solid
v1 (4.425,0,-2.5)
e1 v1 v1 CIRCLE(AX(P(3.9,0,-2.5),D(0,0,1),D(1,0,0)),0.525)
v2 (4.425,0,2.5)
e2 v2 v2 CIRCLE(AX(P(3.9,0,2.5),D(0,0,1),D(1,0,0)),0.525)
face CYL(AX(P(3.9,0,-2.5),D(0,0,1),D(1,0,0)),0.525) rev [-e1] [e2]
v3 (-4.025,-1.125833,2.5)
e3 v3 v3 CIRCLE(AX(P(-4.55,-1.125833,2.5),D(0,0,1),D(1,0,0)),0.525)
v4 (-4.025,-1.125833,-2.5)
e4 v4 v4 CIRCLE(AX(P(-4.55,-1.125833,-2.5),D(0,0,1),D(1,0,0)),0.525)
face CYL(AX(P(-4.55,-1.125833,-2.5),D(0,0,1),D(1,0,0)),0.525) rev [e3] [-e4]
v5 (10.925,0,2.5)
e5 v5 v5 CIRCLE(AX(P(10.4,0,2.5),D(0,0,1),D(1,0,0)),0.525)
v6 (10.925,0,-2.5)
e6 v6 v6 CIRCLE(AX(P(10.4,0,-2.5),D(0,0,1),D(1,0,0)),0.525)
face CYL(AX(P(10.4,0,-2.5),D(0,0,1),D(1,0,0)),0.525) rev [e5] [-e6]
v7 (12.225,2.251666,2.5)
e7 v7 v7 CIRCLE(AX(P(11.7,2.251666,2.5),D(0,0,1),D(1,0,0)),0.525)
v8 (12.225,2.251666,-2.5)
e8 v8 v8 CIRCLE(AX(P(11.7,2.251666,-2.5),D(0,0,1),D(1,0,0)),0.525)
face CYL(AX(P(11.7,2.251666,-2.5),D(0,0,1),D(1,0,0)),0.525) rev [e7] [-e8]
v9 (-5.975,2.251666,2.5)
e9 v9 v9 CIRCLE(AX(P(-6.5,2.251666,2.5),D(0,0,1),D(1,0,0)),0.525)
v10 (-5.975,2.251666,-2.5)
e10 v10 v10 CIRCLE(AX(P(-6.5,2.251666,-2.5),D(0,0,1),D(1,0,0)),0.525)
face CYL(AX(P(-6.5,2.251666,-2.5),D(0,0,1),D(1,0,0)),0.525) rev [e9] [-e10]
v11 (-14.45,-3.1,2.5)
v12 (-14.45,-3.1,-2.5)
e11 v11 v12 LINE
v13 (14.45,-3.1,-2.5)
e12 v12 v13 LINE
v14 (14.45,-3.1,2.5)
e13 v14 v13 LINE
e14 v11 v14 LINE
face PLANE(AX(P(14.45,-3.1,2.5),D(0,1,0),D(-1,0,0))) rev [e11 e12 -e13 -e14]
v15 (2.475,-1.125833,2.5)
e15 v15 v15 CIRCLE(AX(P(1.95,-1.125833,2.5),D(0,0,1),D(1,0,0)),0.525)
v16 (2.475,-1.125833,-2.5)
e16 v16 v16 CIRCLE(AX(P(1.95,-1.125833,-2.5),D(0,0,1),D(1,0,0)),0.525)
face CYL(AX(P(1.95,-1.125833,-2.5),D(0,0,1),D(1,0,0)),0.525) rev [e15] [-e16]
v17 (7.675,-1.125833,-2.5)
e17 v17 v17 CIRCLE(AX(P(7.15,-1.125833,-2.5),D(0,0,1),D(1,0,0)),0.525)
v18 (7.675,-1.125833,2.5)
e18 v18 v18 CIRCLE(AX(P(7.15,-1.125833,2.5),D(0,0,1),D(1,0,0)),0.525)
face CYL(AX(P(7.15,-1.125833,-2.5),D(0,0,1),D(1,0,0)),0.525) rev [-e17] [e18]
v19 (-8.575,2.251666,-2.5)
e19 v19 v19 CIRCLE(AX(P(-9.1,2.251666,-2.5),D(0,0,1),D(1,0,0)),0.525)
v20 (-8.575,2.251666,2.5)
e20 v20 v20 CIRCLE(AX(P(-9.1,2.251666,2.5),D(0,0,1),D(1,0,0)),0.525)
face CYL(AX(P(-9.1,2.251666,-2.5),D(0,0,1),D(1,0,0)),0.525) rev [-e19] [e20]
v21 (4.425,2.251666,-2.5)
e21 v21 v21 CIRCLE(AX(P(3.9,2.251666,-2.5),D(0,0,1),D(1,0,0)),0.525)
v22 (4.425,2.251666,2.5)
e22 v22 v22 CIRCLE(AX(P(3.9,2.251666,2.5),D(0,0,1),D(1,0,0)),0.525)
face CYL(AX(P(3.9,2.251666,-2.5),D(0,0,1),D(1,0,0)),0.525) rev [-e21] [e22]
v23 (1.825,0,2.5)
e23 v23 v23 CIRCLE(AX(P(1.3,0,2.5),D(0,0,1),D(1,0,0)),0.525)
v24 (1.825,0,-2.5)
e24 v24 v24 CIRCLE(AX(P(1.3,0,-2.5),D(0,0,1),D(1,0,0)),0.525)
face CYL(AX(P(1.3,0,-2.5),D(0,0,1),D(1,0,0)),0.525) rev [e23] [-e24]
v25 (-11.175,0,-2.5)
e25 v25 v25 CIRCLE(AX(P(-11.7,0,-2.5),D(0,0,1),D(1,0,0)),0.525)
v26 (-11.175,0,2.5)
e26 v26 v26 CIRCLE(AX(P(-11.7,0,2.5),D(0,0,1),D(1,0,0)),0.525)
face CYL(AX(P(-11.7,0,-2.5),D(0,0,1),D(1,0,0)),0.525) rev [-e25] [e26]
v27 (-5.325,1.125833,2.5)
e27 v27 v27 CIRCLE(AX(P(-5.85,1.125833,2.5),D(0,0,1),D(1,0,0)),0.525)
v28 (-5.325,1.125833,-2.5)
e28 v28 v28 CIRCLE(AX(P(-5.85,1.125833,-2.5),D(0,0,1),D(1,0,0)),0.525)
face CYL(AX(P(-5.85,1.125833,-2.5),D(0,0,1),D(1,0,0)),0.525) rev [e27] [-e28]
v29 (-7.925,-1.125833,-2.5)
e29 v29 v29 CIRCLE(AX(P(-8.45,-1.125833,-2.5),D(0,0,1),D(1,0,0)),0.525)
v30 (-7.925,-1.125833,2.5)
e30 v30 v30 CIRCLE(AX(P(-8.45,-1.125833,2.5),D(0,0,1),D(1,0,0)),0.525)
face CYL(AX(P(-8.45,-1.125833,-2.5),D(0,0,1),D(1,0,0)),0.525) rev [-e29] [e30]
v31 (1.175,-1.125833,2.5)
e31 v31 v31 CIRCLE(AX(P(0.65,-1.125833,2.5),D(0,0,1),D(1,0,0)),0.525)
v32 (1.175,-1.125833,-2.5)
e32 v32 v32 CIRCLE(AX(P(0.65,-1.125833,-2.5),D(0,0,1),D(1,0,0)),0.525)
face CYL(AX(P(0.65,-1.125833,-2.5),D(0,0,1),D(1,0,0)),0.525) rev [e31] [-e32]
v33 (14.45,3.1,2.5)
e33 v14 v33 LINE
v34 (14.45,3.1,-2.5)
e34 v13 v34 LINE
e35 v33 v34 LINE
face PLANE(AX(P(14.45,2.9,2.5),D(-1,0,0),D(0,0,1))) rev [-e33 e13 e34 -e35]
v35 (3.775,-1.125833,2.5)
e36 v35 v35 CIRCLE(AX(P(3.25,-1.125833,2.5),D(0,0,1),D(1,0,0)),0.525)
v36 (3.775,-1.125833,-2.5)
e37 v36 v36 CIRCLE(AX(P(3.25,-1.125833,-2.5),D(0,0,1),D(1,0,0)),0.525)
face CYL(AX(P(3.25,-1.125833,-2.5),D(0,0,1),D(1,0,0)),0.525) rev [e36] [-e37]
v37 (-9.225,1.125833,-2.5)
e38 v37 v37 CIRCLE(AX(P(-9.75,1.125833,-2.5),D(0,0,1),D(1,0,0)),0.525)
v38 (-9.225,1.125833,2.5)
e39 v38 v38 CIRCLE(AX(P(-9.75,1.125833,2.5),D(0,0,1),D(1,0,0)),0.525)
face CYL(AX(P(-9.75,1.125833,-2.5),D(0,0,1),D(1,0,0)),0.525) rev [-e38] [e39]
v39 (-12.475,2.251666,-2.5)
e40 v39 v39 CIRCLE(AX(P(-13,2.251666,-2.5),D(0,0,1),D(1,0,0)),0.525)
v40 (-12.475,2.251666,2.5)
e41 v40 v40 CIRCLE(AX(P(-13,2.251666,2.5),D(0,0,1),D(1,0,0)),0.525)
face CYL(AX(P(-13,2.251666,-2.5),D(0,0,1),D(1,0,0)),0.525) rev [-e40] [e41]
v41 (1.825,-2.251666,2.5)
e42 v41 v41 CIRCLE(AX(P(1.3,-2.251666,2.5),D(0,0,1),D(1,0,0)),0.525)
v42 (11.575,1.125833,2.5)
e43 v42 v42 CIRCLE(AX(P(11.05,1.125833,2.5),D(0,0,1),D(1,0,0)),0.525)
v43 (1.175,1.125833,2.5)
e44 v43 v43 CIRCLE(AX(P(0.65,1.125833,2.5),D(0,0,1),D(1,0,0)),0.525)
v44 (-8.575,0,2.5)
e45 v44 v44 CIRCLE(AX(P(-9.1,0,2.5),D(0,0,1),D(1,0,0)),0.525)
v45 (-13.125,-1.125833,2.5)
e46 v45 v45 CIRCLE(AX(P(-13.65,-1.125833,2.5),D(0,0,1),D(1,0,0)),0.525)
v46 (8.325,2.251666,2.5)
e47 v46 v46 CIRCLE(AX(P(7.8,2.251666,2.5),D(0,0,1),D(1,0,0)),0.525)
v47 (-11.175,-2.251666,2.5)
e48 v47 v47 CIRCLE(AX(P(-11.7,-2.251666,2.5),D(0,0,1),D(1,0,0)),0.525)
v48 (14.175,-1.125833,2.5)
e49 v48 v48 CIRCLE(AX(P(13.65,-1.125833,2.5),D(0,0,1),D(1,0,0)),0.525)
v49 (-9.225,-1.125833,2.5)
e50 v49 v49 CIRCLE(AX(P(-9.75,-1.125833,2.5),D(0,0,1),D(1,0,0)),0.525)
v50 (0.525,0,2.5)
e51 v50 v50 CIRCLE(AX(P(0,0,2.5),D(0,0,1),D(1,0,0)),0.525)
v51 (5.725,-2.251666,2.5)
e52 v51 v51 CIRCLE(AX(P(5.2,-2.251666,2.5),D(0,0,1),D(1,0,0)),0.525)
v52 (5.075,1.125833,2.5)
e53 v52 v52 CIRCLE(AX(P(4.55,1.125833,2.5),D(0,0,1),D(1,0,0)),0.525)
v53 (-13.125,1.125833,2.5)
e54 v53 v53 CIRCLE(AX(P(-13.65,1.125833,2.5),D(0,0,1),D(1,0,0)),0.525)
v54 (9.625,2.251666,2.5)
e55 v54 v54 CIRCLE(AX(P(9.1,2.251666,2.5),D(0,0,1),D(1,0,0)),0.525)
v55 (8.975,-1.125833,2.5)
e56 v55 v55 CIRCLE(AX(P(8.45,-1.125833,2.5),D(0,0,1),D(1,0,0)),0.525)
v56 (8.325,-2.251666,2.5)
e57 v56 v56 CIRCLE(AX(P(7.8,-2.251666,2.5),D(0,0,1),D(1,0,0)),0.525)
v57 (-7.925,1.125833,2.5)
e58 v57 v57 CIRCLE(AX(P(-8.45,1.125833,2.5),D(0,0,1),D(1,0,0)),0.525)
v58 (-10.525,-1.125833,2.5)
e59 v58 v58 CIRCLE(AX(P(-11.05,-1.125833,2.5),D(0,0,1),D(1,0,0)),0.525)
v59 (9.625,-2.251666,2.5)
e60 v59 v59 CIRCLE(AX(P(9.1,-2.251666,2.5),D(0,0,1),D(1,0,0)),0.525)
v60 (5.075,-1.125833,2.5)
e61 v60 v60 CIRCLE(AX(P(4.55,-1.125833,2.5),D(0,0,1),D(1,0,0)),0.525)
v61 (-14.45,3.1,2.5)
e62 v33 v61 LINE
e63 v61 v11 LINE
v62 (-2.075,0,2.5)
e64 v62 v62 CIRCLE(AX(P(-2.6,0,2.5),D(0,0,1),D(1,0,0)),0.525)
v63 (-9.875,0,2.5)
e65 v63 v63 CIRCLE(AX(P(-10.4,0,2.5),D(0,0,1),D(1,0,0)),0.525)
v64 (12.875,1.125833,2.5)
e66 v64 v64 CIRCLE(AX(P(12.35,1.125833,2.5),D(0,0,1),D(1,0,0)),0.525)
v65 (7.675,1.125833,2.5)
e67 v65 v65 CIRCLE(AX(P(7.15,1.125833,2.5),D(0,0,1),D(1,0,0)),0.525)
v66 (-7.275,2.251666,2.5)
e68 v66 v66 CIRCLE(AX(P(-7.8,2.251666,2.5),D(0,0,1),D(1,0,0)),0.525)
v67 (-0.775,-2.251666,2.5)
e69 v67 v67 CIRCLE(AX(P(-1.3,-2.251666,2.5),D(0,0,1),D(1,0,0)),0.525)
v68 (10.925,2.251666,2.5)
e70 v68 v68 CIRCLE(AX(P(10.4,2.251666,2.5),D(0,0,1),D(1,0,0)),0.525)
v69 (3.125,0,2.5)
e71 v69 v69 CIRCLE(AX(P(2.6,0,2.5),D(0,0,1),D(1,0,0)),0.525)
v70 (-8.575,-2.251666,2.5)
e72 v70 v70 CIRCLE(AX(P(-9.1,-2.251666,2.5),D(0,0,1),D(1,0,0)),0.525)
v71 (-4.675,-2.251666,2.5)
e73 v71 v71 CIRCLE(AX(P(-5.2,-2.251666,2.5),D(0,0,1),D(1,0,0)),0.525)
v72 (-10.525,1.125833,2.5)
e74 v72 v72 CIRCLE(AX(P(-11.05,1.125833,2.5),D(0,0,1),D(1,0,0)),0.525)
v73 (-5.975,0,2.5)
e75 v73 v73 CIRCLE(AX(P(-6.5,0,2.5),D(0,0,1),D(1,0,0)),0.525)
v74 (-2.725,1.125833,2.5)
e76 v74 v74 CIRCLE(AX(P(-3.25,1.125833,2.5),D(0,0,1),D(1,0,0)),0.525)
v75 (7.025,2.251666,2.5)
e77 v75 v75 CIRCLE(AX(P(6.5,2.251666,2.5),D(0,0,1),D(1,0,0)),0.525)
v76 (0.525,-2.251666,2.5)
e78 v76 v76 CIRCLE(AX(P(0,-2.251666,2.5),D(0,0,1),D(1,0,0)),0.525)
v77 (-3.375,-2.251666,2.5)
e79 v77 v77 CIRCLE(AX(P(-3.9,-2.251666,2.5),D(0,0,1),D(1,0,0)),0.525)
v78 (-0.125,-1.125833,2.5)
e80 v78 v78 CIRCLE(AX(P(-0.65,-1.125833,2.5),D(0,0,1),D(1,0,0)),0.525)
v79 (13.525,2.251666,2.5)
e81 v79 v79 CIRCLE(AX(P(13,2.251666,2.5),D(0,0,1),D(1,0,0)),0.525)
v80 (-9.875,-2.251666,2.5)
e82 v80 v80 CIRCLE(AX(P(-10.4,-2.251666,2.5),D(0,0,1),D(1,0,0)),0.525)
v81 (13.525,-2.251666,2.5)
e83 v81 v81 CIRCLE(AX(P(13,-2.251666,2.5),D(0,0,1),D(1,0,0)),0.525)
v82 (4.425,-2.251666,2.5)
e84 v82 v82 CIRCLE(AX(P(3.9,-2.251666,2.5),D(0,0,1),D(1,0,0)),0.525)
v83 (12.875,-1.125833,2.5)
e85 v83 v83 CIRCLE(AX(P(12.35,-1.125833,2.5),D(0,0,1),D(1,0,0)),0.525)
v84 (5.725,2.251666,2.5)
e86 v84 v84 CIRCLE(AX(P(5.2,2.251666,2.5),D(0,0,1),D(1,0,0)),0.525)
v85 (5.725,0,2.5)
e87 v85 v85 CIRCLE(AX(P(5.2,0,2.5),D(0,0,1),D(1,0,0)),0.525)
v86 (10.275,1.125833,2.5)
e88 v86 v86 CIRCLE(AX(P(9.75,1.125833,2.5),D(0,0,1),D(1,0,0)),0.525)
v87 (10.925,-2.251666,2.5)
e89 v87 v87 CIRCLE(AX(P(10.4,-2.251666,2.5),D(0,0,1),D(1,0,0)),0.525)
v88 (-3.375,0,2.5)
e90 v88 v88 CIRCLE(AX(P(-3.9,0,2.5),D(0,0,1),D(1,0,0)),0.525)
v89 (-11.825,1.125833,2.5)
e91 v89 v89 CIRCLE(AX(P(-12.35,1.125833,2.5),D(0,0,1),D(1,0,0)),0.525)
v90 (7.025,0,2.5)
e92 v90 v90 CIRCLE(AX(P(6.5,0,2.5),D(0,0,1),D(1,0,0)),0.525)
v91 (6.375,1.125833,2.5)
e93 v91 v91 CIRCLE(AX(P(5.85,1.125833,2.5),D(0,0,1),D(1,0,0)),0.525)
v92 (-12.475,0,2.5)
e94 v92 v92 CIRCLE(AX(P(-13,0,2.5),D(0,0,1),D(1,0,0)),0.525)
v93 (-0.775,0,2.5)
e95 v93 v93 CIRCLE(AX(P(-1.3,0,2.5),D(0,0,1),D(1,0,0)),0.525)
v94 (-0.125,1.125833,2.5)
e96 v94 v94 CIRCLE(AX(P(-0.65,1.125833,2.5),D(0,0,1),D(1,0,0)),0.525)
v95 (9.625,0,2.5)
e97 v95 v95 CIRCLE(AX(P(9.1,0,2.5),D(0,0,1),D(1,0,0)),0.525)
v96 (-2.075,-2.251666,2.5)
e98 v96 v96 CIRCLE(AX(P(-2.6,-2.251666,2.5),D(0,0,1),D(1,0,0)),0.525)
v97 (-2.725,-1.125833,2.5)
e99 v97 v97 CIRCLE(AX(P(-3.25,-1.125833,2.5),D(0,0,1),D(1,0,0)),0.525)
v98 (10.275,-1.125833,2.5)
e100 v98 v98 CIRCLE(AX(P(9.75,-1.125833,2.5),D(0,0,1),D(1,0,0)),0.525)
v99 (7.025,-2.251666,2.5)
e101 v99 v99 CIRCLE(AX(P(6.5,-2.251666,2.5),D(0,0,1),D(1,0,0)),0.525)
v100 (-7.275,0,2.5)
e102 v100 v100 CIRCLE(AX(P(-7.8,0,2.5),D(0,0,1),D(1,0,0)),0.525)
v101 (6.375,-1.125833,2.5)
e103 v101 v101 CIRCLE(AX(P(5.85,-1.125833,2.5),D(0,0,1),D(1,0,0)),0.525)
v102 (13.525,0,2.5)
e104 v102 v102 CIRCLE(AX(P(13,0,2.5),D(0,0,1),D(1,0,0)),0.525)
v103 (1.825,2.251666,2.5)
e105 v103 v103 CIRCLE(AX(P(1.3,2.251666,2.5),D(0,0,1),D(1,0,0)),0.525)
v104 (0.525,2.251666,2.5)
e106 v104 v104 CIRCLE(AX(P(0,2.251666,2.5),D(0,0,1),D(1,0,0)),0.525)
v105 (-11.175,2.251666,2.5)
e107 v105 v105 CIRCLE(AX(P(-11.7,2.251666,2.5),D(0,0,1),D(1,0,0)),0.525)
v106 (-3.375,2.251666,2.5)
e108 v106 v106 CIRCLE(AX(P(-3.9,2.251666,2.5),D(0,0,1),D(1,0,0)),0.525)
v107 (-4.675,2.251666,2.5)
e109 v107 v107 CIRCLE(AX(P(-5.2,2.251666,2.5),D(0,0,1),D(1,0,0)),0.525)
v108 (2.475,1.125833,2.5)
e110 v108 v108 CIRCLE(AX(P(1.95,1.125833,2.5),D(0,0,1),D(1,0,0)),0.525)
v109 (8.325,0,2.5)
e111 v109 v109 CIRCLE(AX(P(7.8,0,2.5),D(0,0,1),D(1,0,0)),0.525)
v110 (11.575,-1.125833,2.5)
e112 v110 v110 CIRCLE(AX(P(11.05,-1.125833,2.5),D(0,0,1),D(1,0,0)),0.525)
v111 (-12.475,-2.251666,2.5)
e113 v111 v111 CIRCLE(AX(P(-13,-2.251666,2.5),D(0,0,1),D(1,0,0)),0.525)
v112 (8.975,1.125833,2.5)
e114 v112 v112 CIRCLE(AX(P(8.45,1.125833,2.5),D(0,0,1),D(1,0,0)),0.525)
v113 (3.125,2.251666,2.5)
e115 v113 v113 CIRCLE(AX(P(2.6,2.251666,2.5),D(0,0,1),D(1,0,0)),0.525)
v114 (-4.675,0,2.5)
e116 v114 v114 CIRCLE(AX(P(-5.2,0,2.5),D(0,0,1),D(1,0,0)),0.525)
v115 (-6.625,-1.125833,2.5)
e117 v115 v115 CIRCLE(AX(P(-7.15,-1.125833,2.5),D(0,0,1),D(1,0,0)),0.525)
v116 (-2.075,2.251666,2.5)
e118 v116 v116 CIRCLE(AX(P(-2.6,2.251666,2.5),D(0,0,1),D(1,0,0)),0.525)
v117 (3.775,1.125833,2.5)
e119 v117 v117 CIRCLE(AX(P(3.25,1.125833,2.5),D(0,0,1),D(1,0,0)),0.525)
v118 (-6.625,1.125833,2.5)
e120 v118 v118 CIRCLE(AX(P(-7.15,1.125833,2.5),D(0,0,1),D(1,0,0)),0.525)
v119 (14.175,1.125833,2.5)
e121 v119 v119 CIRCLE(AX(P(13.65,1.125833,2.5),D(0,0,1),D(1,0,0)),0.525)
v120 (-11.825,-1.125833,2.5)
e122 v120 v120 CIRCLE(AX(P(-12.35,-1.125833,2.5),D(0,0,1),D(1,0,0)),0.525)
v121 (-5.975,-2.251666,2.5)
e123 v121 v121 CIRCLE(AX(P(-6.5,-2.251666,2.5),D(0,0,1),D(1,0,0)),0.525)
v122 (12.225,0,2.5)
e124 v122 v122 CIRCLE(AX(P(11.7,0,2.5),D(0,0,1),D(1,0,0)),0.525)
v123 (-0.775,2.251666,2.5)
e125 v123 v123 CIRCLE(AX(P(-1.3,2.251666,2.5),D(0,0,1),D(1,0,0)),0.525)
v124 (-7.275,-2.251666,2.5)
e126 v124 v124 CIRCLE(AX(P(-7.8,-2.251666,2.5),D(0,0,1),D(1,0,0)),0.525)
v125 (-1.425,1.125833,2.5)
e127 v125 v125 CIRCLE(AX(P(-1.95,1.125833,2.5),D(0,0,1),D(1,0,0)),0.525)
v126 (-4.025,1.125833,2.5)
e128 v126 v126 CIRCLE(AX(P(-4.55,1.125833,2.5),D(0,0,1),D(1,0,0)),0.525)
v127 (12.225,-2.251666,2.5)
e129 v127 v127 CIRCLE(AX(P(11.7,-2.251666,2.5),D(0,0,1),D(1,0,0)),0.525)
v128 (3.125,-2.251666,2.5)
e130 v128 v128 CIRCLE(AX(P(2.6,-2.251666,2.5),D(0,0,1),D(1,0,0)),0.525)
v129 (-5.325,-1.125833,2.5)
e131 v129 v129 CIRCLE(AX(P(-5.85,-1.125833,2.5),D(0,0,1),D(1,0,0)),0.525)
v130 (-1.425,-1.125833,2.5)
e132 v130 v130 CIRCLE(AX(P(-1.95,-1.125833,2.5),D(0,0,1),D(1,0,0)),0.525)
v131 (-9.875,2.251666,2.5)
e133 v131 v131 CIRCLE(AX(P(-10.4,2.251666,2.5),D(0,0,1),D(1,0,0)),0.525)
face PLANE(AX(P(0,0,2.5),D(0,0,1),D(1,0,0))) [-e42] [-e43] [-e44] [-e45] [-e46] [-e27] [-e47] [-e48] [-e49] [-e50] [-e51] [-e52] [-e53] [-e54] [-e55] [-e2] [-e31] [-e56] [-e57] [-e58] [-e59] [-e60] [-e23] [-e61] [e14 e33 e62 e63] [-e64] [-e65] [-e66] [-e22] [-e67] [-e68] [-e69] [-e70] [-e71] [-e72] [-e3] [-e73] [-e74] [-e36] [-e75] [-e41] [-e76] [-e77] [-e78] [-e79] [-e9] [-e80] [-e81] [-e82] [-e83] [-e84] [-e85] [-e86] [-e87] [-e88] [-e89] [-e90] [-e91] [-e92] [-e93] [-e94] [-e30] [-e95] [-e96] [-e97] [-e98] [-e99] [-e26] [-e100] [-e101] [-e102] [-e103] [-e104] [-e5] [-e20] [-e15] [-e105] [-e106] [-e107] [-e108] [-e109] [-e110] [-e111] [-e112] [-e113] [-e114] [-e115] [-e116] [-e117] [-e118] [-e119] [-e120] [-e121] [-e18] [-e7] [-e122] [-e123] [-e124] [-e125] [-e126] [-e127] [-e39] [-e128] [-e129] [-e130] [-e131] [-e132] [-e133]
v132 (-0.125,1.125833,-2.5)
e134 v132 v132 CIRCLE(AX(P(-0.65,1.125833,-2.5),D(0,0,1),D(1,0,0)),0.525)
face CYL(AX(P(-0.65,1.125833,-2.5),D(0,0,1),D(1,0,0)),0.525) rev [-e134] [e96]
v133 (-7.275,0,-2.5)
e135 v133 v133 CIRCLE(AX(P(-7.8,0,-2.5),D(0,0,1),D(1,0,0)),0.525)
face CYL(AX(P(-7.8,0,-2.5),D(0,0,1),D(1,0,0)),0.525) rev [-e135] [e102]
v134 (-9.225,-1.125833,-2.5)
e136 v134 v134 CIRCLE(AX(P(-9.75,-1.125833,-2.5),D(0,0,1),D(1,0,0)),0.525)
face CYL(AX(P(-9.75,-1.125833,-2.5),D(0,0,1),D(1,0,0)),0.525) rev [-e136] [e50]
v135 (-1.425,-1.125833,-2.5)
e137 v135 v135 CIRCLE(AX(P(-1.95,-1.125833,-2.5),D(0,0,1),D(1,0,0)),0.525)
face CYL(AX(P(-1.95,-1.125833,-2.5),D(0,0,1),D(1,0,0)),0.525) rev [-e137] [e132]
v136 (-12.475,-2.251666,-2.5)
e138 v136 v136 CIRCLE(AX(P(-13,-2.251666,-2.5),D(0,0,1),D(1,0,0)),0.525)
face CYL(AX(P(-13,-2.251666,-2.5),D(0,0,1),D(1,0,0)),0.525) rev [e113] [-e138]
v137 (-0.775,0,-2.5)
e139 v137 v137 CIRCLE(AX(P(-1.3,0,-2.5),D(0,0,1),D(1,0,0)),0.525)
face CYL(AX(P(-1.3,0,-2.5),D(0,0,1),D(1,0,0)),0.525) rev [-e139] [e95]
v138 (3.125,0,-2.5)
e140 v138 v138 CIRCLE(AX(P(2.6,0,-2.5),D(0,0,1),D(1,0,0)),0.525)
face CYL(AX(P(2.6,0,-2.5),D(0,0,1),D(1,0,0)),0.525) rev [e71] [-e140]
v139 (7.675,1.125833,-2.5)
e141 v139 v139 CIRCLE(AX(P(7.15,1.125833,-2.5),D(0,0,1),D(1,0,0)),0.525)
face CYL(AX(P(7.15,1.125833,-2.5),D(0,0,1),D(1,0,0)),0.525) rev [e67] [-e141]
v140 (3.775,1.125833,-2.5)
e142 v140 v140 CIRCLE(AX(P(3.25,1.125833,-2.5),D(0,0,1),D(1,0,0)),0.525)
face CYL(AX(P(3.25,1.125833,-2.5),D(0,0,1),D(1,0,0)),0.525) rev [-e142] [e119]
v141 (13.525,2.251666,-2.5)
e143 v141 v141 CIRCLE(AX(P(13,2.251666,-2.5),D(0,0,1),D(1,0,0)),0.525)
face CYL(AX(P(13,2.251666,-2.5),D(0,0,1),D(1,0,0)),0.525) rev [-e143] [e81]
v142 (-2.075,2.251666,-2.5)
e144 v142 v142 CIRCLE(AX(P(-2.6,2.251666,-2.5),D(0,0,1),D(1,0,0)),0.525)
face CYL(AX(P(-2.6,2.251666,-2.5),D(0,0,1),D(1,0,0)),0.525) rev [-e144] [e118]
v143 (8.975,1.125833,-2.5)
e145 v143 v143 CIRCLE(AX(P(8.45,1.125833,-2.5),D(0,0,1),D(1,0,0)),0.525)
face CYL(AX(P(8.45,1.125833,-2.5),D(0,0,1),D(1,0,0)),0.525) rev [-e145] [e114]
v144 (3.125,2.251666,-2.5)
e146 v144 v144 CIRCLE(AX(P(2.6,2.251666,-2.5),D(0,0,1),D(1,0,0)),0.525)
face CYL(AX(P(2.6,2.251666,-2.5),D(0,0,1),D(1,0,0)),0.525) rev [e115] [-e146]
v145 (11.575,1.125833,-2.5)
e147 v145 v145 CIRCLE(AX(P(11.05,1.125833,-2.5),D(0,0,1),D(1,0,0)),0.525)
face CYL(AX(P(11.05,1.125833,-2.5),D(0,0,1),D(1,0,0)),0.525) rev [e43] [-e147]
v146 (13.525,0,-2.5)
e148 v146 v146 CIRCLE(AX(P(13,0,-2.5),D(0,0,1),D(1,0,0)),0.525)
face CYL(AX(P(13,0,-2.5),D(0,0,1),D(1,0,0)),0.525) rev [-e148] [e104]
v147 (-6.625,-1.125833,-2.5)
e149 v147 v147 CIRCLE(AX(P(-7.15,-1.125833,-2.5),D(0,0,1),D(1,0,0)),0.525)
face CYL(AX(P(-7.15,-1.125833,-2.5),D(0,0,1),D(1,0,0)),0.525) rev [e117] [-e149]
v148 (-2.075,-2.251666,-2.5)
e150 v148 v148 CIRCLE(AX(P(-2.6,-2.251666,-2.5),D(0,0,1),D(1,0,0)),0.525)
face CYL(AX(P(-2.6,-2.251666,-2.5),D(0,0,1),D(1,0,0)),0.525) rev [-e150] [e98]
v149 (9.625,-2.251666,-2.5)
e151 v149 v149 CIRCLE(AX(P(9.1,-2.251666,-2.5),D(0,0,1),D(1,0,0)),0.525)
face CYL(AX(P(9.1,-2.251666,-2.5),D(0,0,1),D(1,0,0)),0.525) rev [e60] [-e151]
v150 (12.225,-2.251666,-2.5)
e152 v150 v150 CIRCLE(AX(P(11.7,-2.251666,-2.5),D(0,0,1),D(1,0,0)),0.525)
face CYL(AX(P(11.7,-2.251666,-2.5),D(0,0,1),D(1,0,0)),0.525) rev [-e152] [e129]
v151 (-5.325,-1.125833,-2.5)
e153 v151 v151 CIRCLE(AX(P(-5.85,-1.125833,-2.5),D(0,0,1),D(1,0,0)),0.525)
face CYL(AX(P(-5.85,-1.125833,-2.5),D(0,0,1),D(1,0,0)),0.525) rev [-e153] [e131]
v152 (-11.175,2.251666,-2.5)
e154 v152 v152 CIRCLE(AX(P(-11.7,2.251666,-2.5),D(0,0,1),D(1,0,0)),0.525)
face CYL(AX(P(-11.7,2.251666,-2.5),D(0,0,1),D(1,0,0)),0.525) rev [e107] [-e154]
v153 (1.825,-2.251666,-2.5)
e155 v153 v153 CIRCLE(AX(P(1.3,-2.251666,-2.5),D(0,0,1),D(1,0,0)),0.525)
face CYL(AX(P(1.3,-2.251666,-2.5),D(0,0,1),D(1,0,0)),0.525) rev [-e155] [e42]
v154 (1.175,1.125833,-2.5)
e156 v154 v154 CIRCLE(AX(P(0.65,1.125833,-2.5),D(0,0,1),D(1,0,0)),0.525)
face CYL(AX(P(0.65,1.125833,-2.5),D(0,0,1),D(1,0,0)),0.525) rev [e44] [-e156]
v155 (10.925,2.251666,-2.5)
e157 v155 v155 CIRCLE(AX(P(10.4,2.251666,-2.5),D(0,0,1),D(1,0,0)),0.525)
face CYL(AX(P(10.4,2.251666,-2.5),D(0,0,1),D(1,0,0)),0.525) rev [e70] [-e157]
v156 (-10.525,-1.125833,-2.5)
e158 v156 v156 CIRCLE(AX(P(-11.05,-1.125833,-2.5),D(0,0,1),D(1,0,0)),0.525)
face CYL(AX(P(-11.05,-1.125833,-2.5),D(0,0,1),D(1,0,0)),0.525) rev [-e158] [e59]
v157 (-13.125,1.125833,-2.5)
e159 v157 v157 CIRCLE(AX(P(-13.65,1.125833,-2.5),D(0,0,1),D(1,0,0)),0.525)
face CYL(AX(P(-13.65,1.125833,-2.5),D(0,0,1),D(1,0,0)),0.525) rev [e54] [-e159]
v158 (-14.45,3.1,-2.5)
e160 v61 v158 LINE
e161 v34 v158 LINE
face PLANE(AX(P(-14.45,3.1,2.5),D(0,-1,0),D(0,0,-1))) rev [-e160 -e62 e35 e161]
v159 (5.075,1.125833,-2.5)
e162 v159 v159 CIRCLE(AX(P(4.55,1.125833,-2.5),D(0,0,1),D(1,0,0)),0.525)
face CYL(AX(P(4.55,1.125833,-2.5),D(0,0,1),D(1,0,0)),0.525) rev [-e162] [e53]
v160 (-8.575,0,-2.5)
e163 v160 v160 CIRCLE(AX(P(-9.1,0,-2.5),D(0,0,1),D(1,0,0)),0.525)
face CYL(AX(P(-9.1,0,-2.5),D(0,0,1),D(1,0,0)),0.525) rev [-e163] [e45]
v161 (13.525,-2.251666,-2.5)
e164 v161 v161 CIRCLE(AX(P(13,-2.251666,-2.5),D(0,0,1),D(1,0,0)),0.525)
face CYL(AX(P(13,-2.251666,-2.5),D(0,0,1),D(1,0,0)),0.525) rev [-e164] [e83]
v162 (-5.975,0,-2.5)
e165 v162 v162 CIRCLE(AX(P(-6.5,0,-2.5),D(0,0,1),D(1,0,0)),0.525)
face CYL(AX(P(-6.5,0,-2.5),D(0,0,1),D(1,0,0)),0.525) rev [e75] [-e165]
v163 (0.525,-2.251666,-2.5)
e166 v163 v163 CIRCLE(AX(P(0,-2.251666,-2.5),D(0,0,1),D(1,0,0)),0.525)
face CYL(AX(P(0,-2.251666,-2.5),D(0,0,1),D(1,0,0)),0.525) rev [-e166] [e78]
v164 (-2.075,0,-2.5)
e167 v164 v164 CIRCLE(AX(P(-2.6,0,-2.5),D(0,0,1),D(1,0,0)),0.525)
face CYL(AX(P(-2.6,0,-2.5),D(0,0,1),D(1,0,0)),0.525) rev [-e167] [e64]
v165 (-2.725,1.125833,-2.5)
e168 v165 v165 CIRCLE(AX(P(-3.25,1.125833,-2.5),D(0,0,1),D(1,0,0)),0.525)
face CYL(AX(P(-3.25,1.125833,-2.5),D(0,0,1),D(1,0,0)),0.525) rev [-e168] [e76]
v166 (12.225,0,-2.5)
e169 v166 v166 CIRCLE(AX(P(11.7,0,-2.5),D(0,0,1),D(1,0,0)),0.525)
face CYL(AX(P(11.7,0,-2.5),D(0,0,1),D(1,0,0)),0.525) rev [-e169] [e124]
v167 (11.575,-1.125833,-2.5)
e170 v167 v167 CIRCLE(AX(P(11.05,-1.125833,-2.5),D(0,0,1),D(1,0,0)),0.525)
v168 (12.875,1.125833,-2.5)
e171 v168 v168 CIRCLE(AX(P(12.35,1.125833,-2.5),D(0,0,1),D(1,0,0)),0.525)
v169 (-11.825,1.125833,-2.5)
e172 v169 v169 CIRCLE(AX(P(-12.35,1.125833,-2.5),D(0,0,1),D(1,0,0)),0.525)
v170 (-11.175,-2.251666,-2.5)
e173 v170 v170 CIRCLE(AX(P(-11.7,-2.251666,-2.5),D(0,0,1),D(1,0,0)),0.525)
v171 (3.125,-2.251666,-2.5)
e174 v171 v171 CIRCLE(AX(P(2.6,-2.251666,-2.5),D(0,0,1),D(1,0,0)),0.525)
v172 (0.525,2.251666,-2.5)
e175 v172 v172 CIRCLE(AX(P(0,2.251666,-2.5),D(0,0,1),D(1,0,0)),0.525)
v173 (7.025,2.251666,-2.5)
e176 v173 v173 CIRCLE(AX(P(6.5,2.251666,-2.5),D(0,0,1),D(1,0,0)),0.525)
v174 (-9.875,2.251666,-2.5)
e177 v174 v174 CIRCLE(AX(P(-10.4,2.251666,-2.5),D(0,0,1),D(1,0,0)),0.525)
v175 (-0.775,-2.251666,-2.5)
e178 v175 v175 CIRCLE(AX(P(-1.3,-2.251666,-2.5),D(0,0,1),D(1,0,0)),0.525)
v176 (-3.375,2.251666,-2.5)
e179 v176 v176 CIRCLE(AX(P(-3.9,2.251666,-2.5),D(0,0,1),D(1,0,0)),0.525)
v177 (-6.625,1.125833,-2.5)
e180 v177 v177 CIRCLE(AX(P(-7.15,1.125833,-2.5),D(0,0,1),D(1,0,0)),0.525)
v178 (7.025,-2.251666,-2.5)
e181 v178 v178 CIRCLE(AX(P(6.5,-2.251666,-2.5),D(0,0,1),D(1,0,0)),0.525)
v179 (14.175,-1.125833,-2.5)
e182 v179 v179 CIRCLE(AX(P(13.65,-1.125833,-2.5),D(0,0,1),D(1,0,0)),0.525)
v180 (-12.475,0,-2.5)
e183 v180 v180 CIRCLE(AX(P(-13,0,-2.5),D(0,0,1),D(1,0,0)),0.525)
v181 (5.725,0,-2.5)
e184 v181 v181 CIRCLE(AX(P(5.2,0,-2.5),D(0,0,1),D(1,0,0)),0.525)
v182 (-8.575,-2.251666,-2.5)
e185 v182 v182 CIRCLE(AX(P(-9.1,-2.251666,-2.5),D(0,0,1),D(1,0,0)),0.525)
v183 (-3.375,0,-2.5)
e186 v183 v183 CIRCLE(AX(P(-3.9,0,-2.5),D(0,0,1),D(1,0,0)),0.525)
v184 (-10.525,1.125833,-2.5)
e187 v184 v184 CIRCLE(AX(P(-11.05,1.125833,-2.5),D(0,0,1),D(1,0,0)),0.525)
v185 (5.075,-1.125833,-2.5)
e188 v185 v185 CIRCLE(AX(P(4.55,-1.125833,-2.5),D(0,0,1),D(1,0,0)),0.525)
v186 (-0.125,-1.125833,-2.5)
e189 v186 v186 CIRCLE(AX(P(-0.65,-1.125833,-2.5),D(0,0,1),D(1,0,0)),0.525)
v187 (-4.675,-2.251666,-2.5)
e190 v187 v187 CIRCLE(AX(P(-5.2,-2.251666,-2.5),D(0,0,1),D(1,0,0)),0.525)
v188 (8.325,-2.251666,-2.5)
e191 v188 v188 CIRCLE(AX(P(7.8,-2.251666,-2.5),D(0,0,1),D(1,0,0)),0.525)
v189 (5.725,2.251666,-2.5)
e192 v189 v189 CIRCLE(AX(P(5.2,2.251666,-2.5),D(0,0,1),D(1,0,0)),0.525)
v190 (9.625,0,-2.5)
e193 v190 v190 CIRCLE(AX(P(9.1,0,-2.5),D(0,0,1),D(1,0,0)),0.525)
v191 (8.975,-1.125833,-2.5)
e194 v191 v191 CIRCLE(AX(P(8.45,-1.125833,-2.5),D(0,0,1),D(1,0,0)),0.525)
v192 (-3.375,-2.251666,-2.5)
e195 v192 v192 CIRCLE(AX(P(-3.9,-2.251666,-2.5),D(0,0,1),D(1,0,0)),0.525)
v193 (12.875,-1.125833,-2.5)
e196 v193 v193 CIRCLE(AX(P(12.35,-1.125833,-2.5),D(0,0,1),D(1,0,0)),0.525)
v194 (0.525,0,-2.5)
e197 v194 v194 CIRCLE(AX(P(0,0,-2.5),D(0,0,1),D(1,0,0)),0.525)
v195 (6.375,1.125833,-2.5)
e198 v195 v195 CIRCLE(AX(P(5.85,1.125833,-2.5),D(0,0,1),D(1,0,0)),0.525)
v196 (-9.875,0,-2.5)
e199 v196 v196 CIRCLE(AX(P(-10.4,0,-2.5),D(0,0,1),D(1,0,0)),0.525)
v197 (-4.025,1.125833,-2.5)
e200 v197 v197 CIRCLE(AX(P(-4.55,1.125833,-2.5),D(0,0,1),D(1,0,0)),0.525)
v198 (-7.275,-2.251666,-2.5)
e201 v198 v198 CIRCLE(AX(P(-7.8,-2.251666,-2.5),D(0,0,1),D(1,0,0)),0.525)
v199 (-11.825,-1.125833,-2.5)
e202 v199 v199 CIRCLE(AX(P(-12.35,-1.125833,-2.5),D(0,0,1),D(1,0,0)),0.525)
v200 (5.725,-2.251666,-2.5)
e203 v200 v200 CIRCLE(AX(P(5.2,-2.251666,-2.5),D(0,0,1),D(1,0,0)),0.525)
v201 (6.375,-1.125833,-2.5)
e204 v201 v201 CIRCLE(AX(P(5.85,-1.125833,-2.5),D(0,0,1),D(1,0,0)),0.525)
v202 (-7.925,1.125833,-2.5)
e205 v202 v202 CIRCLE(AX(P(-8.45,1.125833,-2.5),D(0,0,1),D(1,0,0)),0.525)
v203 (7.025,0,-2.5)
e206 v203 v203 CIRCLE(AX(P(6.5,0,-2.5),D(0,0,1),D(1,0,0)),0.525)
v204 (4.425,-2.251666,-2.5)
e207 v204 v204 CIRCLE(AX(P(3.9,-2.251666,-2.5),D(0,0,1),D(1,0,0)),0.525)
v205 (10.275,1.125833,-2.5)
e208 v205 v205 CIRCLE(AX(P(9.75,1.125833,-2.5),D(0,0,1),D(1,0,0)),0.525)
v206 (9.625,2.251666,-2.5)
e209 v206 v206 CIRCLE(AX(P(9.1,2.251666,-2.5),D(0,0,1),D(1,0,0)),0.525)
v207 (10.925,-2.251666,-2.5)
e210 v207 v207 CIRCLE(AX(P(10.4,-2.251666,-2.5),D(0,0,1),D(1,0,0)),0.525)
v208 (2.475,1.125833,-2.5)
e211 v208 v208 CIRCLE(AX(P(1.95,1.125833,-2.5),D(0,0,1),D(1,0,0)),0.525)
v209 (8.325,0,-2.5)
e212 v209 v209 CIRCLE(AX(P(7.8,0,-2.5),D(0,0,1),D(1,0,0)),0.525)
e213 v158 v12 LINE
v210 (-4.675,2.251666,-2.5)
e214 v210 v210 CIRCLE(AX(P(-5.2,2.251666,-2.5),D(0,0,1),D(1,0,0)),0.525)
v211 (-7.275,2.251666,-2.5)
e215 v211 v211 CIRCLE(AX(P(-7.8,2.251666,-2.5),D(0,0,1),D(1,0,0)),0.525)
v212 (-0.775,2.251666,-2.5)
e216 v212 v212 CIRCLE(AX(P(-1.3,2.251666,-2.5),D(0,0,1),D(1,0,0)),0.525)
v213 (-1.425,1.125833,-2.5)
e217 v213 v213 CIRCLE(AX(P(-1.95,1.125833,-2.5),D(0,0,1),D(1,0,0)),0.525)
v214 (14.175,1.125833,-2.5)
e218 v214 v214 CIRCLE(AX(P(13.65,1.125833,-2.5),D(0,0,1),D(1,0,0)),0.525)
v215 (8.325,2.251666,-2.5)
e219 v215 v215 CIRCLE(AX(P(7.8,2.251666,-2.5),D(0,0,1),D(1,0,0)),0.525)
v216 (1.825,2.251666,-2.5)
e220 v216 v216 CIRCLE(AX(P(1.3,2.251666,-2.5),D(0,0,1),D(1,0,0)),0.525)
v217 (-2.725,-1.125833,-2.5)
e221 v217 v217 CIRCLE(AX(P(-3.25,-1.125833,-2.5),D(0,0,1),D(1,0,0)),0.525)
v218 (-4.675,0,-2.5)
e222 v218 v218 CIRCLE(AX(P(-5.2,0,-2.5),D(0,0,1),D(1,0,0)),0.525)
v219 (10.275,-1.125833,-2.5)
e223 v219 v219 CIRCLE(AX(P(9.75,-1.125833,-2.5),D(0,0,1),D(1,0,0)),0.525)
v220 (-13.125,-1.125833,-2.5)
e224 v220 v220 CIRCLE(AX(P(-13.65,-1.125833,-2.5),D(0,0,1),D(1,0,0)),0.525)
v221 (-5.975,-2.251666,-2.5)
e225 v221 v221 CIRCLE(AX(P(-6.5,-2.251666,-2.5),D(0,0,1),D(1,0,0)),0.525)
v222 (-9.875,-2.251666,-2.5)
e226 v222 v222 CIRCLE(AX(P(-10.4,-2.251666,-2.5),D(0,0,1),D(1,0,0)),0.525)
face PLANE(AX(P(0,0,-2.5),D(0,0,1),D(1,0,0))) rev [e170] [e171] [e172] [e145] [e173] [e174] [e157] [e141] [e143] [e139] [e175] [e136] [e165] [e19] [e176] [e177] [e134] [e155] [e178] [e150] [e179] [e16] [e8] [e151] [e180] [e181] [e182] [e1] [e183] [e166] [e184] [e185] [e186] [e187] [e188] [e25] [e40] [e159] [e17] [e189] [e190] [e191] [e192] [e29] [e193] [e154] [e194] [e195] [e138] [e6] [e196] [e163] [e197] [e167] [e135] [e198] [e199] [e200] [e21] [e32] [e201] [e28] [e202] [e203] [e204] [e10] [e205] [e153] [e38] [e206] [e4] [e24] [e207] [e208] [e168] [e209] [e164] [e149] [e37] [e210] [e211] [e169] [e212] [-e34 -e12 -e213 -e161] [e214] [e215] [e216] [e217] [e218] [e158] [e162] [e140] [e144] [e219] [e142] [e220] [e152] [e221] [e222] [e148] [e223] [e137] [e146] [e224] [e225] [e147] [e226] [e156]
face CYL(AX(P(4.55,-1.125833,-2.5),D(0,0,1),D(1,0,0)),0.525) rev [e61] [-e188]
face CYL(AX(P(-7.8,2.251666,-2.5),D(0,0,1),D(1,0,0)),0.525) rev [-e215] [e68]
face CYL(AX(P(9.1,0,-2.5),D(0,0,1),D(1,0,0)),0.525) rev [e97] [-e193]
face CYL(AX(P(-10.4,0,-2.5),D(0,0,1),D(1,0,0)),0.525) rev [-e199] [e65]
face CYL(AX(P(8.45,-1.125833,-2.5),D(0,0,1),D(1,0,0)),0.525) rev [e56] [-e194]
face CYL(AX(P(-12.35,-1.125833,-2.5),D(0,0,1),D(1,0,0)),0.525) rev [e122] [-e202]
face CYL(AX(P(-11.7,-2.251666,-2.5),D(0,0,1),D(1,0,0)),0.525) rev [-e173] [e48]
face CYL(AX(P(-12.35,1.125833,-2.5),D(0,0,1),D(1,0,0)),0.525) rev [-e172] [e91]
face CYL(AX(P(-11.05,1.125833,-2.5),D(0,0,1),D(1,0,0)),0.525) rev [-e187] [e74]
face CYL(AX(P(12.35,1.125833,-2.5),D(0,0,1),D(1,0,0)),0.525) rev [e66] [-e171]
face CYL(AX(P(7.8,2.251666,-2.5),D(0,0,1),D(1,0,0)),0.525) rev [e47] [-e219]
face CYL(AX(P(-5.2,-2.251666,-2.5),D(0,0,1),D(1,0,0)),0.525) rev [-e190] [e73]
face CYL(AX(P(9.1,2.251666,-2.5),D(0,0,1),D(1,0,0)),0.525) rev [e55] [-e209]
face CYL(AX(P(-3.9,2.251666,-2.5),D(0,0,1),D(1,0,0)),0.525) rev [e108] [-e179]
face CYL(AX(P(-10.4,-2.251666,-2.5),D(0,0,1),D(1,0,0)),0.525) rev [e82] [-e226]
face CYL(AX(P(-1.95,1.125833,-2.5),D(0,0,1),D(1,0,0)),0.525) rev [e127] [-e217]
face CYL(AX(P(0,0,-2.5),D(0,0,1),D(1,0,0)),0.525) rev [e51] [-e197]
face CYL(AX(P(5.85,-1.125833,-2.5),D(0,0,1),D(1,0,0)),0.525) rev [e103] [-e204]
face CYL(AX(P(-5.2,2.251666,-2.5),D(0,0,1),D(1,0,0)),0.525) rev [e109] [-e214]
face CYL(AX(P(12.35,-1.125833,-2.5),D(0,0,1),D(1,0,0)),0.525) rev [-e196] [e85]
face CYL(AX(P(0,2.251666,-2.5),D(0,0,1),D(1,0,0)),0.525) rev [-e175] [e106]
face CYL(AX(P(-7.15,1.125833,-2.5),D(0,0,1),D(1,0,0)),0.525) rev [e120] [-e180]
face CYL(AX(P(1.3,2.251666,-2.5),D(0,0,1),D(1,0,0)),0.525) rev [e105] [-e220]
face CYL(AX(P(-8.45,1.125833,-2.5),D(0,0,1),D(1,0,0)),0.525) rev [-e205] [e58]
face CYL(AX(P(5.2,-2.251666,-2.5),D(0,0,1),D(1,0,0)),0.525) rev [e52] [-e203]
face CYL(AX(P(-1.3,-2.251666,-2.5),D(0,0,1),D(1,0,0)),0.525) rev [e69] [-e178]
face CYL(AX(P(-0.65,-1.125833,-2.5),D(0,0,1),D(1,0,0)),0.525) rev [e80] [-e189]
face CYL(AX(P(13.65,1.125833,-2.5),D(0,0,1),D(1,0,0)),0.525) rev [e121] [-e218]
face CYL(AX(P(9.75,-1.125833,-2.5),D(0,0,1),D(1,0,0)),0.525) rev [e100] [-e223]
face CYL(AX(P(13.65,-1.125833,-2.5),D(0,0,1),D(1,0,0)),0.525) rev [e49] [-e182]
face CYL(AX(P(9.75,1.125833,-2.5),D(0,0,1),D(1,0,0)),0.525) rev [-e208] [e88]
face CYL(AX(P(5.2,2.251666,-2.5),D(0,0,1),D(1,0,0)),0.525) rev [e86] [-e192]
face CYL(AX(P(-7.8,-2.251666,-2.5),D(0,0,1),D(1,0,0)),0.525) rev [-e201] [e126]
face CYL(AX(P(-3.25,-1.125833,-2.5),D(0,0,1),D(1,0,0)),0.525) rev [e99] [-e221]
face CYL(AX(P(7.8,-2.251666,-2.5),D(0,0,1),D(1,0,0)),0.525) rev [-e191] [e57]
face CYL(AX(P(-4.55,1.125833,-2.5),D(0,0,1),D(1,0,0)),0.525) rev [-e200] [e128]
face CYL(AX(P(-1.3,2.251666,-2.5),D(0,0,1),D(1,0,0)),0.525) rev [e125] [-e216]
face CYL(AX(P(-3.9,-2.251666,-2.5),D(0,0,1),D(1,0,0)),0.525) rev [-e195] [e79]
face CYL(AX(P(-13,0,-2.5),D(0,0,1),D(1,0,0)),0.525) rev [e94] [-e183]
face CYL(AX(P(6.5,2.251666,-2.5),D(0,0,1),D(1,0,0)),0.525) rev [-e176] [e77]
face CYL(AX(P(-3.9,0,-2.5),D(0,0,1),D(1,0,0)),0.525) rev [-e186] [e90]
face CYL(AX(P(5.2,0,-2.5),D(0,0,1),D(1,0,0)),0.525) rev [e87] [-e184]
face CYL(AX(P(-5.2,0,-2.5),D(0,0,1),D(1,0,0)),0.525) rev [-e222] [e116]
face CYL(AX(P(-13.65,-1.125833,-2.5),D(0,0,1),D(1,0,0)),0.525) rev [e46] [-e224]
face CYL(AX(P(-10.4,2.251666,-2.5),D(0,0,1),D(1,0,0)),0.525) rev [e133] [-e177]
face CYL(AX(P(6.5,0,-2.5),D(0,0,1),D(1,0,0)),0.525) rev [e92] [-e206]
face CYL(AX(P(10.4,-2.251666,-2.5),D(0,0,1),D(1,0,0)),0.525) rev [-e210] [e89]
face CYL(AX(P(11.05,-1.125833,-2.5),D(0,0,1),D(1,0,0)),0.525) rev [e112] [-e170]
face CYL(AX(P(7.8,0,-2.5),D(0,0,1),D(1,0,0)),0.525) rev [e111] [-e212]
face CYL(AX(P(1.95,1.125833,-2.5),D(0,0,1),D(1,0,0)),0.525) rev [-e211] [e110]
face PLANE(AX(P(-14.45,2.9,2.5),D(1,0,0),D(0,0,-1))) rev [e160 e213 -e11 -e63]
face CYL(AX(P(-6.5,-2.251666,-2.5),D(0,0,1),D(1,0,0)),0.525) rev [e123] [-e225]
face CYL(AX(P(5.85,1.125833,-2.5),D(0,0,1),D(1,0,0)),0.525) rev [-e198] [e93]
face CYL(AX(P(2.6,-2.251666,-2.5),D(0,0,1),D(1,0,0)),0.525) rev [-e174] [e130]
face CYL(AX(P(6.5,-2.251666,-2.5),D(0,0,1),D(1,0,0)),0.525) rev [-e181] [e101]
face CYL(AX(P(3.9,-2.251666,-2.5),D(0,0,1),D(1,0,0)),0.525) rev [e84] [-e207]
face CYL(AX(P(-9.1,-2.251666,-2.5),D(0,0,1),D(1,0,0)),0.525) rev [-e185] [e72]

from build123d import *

# Parameters (mm, degrees)
SKETCH1_W               = 28.9
SKETCH1_H               = 5.8
BOSS_EXTRUDE1_DEPTH     = 2.5
CUT_EXTRUDE1_DEPTH      = 15.948662147
CUT_EXTRUDE1_DEPTH_BACK = 15.948662147
SKETCH2_R               = 0.525
FILL_START              = -2.5
FILL_PATTERN1_OUTLINE_R = 0.525
FILL_PATTERN1_DEPTH     = 5
SKETCH4_W               = 28.9
SKETCH4_H               = 0.2
BOSS_EXTRUDE2_DEPTH     = 2.5


# Read off the part's stored shape, not the designer's step: Fill Pattern1
with BuildPart() as part:
    # Sketch1 → Boss-Extrude1 (new, symmetric)
    with BuildSketch(Plane.XY):
        Rectangle(SKETCH1_W, SKETCH1_H)
    extrude(amount=BOSS_EXTRUDE1_DEPTH, both=True)

    # Sketch2 → Cut-Extrude1 (cut, two sides: drawn at the far end of the back side and taken through both)
    with BuildSketch(Plane.XY.offset(-CUT_EXTRUDE1_DEPTH_BACK)):
        Circle(SKETCH2_R)
    extrude(amount=CUT_EXTRUDE1_DEPTH + CUT_EXTRUDE1_DEPTH_BACK, mode=Mode.SUBTRACT)

    # Fill Pattern1 outline → Fill Pattern1 (cut)
    with BuildSketch(Plane.XY.offset(FILL_START)):
        with Locations((13.65, -1.125833025)):
            Circle(FILL_PATTERN1_OUTLINE_R)
        with Locations((-9.75, -1.125833025)):
            Circle(FILL_PATTERN1_OUTLINE_R)
        with Locations((-9.1, 0)):
            Circle(FILL_PATTERN1_OUTLINE_R)
        with Locations((-8.45, 1.125833025)):
            Circle(FILL_PATTERN1_OUTLINE_R)
        with Locations((-7.8, 2.25166605)):
            Circle(FILL_PATTERN1_OUTLINE_R)
        with Locations((-9.1, -2.25166605)):
            Circle(FILL_PATTERN1_OUTLINE_R)
        with Locations((-8.45, -1.125833025)):
            Circle(FILL_PATTERN1_OUTLINE_R)
        with Locations((-7.8, 0)):
            Circle(FILL_PATTERN1_OUTLINE_R)
        with Locations((-7.15, 1.125833025)):
            Circle(FILL_PATTERN1_OUTLINE_R)
        with Locations((-11.05, 1.125833025)):
            Circle(FILL_PATTERN1_OUTLINE_R)
        with Locations((-10.4, 2.25166605)):
            Circle(FILL_PATTERN1_OUTLINE_R)
        with Locations((-11.7, -2.25166605)):
            Circle(FILL_PATTERN1_OUTLINE_R)
        with Locations((-11.05, -1.125833025)):
            Circle(FILL_PATTERN1_OUTLINE_R)
        with Locations((-10.4, -2.25166605)):
            Circle(FILL_PATTERN1_OUTLINE_R)
        with Locations((-9.1, 2.25166605)):
            Circle(FILL_PATTERN1_OUTLINE_R)
        with Locations((-9.75, 1.125833025)):
            Circle(FILL_PATTERN1_OUTLINE_R)
        with Locations((-10.4, 0)):
            Circle(FILL_PATTERN1_OUTLINE_R)
        with Locations((-5.2, -2.25166605)):
            Circle(FILL_PATTERN1_OUTLINE_R)
        with Locations((-3.9, 2.25166605)):
            Circle(FILL_PATTERN1_OUTLINE_R)
        with Locations((-4.55, 1.125833025)):
            Circle(FILL_PATTERN1_OUTLINE_R)
        with Locations((-5.2, 0)):
            Circle(FILL_PATTERN1_OUTLINE_R)
        with Locations((-4.55, -1.125833025)):
            Circle(FILL_PATTERN1_OUTLINE_R)
        with Locations((-3.9, 0)):
            Circle(FILL_PATTERN1_OUTLINE_R)
        with Locations((-3.25, 1.125833025)):
            Circle(FILL_PATTERN1_OUTLINE_R)
        with Locations((-2.6, 2.25166605)):
            Circle(FILL_PATTERN1_OUTLINE_R)
        with Locations((-6.5, 0)):
            Circle(FILL_PATTERN1_OUTLINE_R)
        with Locations((-7.15, -1.125833025)):
            Circle(FILL_PATTERN1_OUTLINE_R)
        with Locations((-7.8, -2.25166605)):
            Circle(FILL_PATTERN1_OUTLINE_R)
        with Locations((-6.5, 2.25166605)):
            Circle(FILL_PATTERN1_OUTLINE_R)
        with Locations((-5.85, 1.125833025)):
            Circle(FILL_PATTERN1_OUTLINE_R)
        with Locations((-5.2, 2.25166605)):
            Circle(FILL_PATTERN1_OUTLINE_R)
        with Locations((-6.5, -2.25166605)):
            Circle(FILL_PATTERN1_OUTLINE_R)
        with Locations((-5.85, -1.125833025)):
            Circle(FILL_PATTERN1_OUTLINE_R)
        with Locations((-13.65, 1.125833025)):
            Circle(FILL_PATTERN1_OUTLINE_R)
        with Locations((-11.7, 2.25166605)):
            Circle(FILL_PATTERN1_OUTLINE_R)
        with Locations((-13, -2.25166605)):
            Circle(FILL_PATTERN1_OUTLINE_R)
        with Locations((-12.35, -1.125833025)):
            Circle(FILL_PATTERN1_OUTLINE_R)
        with Locations((-11.7, 0)):
            Circle(FILL_PATTERN1_OUTLINE_R)
        with Locations((-13, 2.25166605)):
            Circle(FILL_PATTERN1_OUTLINE_R)
        with Locations((-13.65, -1.125833025)):
            Circle(FILL_PATTERN1_OUTLINE_R)
        with Locations((-13, 0)):
            Circle(FILL_PATTERN1_OUTLINE_R)
        with Locations((-12.35, 1.125833025)):
            Circle(FILL_PATTERN1_OUTLINE_R)
        with Locations((7.15, -1.125833025)):
            Circle(FILL_PATTERN1_OUTLINE_R)
        with Locations((7.8, 0)):
            Circle(FILL_PATTERN1_OUTLINE_R)
        with Locations((8.45, 1.125833025)):
            Circle(FILL_PATTERN1_OUTLINE_R)
        with Locations((9.1, 2.25166605)):
            Circle(FILL_PATTERN1_OUTLINE_R)
        with Locations((7.8, -2.25166605)):
            Circle(FILL_PATTERN1_OUTLINE_R)
        with Locations((8.45, -1.125833025)):
            Circle(FILL_PATTERN1_OUTLINE_R)
        with Locations((9.1, 0)):
            Circle(FILL_PATTERN1_OUTLINE_R)
        with Locations((9.75, 1.125833025)):
            Circle(FILL_PATTERN1_OUTLINE_R)
        with Locations((5.85, 1.125833025)):
            Circle(FILL_PATTERN1_OUTLINE_R)
        with Locations((6.5, 2.25166605)):
            Circle(FILL_PATTERN1_OUTLINE_R)
        with Locations((5.2, -2.25166605)):
            Circle(FILL_PATTERN1_OUTLINE_R)
        with Locations((5.85, -1.125833025)):
            Circle(FILL_PATTERN1_OUTLINE_R)
        with Locations((6.5, -2.25166605)):
            Circle(FILL_PATTERN1_OUTLINE_R)
        with Locations((7.8, 2.25166605)):
            Circle(FILL_PATTERN1_OUTLINE_R)
        with Locations((7.15, 1.125833025)):
            Circle(FILL_PATTERN1_OUTLINE_R)
        with Locations((6.5, 0)):
            Circle(FILL_PATTERN1_OUTLINE_R)
        with Locations((11.7, -2.25166605)):
            Circle(FILL_PATTERN1_OUTLINE_R)
        with Locations((13, 2.25166605)):
            Circle(FILL_PATTERN1_OUTLINE_R)
        with Locations((12.35, 1.125833025)):
            Circle(FILL_PATTERN1_OUTLINE_R)
        with Locations((11.7, 0)):
            Circle(FILL_PATTERN1_OUTLINE_R)
        with Locations((13, -2.25166605)):
            Circle(FILL_PATTERN1_OUTLINE_R)
        with Locations((13.65, 1.125833025)):
            Circle(FILL_PATTERN1_OUTLINE_R)
        with Locations((13, 0)):
            Circle(FILL_PATTERN1_OUTLINE_R)
        with Locations((12.35, -1.125833025)):
            Circle(FILL_PATTERN1_OUTLINE_R)
        with Locations((10.4, 0)):
            Circle(FILL_PATTERN1_OUTLINE_R)
        with Locations((9.75, -1.125833025)):
            Circle(FILL_PATTERN1_OUTLINE_R)
        with Locations((9.1, -2.25166605)):
            Circle(FILL_PATTERN1_OUTLINE_R)
        with Locations((10.4, 2.25166605)):
            Circle(FILL_PATTERN1_OUTLINE_R)
        with Locations((11.05, 1.125833025)):
            Circle(FILL_PATTERN1_OUTLINE_R)
        with Locations((11.7, 2.25166605)):
            Circle(FILL_PATTERN1_OUTLINE_R)
        with Locations((10.4, -2.25166605)):
            Circle(FILL_PATTERN1_OUTLINE_R)
        with Locations((11.05, -1.125833025)):
            Circle(FILL_PATTERN1_OUTLINE_R)
        with Locations((-0.65, 1.125833025)):
            Circle(FILL_PATTERN1_OUTLINE_R)
        with Locations((0, 2.25166605)):
            Circle(FILL_PATTERN1_OUTLINE_R)
        with Locations((-1.3, -2.25166605)):
            Circle(FILL_PATTERN1_OUTLINE_R)
        with Locations((-0.65, -1.125833025)):
            Circle(FILL_PATTERN1_OUTLINE_R)
        with Locations((0.65, 1.125833025)):
            Circle(FILL_PATTERN1_OUTLINE_R)
        with Locations((1.3, 2.25166605)):
            Circle(FILL_PATTERN1_OUTLINE_R)
        with Locations((0, -2.25166605)):
            Circle(FILL_PATTERN1_OUTLINE_R)
        with Locations((0.65, -1.125833025)):
            Circle(FILL_PATTERN1_OUTLINE_R)
        with Locations((-3.9, -2.25166605)):
            Circle(FILL_PATTERN1_OUTLINE_R)
        with Locations((-3.25, -1.125833025)):
            Circle(FILL_PATTERN1_OUTLINE_R)
        with Locations((-2.6, 0)):
            Circle(FILL_PATTERN1_OUTLINE_R)
        with Locations((-1.95, 1.125833025)):
            Circle(FILL_PATTERN1_OUTLINE_R)
        with Locations((-1.3, 0)):
            Circle(FILL_PATTERN1_OUTLINE_R)
        with Locations((-1.95, -1.125833025)):
            Circle(FILL_PATTERN1_OUTLINE_R)
        with Locations((-2.6, -2.25166605)):
            Circle(FILL_PATTERN1_OUTLINE_R)
        with Locations((-1.3, 2.25166605)):
            Circle(FILL_PATTERN1_OUTLINE_R)
        with Locations((2.6, -2.25166605)):
            Circle(FILL_PATTERN1_OUTLINE_R)
        with Locations((3.25, -1.125833025)):
            Circle(FILL_PATTERN1_OUTLINE_R)
        with Locations((3.9, 0)):
            Circle(FILL_PATTERN1_OUTLINE_R)
        with Locations((4.55, 1.125833025)):
            Circle(FILL_PATTERN1_OUTLINE_R)
        with Locations((5.2, 0)):
            Circle(FILL_PATTERN1_OUTLINE_R)
        with Locations((4.55, -1.125833025)):
            Circle(FILL_PATTERN1_OUTLINE_R)
        with Locations((3.9, -2.25166605)):
            Circle(FILL_PATTERN1_OUTLINE_R)
        with Locations((5.2, 2.25166605)):
            Circle(FILL_PATTERN1_OUTLINE_R)
        with Locations((1.3, -2.25166605)):
            Circle(FILL_PATTERN1_OUTLINE_R)
        with Locations((2.6, 2.25166605)):
            Circle(FILL_PATTERN1_OUTLINE_R)
        with Locations((1.95, 1.125833025)):
            Circle(FILL_PATTERN1_OUTLINE_R)
        with Locations((1.3, 0)):
            Circle(FILL_PATTERN1_OUTLINE_R)
        with Locations((1.95, -1.125833025)):
            Circle(FILL_PATTERN1_OUTLINE_R)
        with Locations((2.6, 0)):
            Circle(FILL_PATTERN1_OUTLINE_R)
        with Locations((3.25, 1.125833025)):
            Circle(FILL_PATTERN1_OUTLINE_R)
        with Locations((3.9, 2.25166605)):
            Circle(FILL_PATTERN1_OUTLINE_R)
    extrude(amount=FILL_PATTERN1_DEPTH, mode=Mode.SUBTRACT)

    # Sketch4 → Boss-Extrude2 (add, symmetric)
    with BuildSketch(Plane.XY):
        with Locations((0, 3)):
            Rectangle(SKETCH4_W, SKETCH4_H)
        with Locations((0, -3)):
            Rectangle(SKETCH4_W, SKETCH4_H)
    extrude(amount=BOSS_EXTRUDE2_DEPTH, both=True)


solid = part.part
